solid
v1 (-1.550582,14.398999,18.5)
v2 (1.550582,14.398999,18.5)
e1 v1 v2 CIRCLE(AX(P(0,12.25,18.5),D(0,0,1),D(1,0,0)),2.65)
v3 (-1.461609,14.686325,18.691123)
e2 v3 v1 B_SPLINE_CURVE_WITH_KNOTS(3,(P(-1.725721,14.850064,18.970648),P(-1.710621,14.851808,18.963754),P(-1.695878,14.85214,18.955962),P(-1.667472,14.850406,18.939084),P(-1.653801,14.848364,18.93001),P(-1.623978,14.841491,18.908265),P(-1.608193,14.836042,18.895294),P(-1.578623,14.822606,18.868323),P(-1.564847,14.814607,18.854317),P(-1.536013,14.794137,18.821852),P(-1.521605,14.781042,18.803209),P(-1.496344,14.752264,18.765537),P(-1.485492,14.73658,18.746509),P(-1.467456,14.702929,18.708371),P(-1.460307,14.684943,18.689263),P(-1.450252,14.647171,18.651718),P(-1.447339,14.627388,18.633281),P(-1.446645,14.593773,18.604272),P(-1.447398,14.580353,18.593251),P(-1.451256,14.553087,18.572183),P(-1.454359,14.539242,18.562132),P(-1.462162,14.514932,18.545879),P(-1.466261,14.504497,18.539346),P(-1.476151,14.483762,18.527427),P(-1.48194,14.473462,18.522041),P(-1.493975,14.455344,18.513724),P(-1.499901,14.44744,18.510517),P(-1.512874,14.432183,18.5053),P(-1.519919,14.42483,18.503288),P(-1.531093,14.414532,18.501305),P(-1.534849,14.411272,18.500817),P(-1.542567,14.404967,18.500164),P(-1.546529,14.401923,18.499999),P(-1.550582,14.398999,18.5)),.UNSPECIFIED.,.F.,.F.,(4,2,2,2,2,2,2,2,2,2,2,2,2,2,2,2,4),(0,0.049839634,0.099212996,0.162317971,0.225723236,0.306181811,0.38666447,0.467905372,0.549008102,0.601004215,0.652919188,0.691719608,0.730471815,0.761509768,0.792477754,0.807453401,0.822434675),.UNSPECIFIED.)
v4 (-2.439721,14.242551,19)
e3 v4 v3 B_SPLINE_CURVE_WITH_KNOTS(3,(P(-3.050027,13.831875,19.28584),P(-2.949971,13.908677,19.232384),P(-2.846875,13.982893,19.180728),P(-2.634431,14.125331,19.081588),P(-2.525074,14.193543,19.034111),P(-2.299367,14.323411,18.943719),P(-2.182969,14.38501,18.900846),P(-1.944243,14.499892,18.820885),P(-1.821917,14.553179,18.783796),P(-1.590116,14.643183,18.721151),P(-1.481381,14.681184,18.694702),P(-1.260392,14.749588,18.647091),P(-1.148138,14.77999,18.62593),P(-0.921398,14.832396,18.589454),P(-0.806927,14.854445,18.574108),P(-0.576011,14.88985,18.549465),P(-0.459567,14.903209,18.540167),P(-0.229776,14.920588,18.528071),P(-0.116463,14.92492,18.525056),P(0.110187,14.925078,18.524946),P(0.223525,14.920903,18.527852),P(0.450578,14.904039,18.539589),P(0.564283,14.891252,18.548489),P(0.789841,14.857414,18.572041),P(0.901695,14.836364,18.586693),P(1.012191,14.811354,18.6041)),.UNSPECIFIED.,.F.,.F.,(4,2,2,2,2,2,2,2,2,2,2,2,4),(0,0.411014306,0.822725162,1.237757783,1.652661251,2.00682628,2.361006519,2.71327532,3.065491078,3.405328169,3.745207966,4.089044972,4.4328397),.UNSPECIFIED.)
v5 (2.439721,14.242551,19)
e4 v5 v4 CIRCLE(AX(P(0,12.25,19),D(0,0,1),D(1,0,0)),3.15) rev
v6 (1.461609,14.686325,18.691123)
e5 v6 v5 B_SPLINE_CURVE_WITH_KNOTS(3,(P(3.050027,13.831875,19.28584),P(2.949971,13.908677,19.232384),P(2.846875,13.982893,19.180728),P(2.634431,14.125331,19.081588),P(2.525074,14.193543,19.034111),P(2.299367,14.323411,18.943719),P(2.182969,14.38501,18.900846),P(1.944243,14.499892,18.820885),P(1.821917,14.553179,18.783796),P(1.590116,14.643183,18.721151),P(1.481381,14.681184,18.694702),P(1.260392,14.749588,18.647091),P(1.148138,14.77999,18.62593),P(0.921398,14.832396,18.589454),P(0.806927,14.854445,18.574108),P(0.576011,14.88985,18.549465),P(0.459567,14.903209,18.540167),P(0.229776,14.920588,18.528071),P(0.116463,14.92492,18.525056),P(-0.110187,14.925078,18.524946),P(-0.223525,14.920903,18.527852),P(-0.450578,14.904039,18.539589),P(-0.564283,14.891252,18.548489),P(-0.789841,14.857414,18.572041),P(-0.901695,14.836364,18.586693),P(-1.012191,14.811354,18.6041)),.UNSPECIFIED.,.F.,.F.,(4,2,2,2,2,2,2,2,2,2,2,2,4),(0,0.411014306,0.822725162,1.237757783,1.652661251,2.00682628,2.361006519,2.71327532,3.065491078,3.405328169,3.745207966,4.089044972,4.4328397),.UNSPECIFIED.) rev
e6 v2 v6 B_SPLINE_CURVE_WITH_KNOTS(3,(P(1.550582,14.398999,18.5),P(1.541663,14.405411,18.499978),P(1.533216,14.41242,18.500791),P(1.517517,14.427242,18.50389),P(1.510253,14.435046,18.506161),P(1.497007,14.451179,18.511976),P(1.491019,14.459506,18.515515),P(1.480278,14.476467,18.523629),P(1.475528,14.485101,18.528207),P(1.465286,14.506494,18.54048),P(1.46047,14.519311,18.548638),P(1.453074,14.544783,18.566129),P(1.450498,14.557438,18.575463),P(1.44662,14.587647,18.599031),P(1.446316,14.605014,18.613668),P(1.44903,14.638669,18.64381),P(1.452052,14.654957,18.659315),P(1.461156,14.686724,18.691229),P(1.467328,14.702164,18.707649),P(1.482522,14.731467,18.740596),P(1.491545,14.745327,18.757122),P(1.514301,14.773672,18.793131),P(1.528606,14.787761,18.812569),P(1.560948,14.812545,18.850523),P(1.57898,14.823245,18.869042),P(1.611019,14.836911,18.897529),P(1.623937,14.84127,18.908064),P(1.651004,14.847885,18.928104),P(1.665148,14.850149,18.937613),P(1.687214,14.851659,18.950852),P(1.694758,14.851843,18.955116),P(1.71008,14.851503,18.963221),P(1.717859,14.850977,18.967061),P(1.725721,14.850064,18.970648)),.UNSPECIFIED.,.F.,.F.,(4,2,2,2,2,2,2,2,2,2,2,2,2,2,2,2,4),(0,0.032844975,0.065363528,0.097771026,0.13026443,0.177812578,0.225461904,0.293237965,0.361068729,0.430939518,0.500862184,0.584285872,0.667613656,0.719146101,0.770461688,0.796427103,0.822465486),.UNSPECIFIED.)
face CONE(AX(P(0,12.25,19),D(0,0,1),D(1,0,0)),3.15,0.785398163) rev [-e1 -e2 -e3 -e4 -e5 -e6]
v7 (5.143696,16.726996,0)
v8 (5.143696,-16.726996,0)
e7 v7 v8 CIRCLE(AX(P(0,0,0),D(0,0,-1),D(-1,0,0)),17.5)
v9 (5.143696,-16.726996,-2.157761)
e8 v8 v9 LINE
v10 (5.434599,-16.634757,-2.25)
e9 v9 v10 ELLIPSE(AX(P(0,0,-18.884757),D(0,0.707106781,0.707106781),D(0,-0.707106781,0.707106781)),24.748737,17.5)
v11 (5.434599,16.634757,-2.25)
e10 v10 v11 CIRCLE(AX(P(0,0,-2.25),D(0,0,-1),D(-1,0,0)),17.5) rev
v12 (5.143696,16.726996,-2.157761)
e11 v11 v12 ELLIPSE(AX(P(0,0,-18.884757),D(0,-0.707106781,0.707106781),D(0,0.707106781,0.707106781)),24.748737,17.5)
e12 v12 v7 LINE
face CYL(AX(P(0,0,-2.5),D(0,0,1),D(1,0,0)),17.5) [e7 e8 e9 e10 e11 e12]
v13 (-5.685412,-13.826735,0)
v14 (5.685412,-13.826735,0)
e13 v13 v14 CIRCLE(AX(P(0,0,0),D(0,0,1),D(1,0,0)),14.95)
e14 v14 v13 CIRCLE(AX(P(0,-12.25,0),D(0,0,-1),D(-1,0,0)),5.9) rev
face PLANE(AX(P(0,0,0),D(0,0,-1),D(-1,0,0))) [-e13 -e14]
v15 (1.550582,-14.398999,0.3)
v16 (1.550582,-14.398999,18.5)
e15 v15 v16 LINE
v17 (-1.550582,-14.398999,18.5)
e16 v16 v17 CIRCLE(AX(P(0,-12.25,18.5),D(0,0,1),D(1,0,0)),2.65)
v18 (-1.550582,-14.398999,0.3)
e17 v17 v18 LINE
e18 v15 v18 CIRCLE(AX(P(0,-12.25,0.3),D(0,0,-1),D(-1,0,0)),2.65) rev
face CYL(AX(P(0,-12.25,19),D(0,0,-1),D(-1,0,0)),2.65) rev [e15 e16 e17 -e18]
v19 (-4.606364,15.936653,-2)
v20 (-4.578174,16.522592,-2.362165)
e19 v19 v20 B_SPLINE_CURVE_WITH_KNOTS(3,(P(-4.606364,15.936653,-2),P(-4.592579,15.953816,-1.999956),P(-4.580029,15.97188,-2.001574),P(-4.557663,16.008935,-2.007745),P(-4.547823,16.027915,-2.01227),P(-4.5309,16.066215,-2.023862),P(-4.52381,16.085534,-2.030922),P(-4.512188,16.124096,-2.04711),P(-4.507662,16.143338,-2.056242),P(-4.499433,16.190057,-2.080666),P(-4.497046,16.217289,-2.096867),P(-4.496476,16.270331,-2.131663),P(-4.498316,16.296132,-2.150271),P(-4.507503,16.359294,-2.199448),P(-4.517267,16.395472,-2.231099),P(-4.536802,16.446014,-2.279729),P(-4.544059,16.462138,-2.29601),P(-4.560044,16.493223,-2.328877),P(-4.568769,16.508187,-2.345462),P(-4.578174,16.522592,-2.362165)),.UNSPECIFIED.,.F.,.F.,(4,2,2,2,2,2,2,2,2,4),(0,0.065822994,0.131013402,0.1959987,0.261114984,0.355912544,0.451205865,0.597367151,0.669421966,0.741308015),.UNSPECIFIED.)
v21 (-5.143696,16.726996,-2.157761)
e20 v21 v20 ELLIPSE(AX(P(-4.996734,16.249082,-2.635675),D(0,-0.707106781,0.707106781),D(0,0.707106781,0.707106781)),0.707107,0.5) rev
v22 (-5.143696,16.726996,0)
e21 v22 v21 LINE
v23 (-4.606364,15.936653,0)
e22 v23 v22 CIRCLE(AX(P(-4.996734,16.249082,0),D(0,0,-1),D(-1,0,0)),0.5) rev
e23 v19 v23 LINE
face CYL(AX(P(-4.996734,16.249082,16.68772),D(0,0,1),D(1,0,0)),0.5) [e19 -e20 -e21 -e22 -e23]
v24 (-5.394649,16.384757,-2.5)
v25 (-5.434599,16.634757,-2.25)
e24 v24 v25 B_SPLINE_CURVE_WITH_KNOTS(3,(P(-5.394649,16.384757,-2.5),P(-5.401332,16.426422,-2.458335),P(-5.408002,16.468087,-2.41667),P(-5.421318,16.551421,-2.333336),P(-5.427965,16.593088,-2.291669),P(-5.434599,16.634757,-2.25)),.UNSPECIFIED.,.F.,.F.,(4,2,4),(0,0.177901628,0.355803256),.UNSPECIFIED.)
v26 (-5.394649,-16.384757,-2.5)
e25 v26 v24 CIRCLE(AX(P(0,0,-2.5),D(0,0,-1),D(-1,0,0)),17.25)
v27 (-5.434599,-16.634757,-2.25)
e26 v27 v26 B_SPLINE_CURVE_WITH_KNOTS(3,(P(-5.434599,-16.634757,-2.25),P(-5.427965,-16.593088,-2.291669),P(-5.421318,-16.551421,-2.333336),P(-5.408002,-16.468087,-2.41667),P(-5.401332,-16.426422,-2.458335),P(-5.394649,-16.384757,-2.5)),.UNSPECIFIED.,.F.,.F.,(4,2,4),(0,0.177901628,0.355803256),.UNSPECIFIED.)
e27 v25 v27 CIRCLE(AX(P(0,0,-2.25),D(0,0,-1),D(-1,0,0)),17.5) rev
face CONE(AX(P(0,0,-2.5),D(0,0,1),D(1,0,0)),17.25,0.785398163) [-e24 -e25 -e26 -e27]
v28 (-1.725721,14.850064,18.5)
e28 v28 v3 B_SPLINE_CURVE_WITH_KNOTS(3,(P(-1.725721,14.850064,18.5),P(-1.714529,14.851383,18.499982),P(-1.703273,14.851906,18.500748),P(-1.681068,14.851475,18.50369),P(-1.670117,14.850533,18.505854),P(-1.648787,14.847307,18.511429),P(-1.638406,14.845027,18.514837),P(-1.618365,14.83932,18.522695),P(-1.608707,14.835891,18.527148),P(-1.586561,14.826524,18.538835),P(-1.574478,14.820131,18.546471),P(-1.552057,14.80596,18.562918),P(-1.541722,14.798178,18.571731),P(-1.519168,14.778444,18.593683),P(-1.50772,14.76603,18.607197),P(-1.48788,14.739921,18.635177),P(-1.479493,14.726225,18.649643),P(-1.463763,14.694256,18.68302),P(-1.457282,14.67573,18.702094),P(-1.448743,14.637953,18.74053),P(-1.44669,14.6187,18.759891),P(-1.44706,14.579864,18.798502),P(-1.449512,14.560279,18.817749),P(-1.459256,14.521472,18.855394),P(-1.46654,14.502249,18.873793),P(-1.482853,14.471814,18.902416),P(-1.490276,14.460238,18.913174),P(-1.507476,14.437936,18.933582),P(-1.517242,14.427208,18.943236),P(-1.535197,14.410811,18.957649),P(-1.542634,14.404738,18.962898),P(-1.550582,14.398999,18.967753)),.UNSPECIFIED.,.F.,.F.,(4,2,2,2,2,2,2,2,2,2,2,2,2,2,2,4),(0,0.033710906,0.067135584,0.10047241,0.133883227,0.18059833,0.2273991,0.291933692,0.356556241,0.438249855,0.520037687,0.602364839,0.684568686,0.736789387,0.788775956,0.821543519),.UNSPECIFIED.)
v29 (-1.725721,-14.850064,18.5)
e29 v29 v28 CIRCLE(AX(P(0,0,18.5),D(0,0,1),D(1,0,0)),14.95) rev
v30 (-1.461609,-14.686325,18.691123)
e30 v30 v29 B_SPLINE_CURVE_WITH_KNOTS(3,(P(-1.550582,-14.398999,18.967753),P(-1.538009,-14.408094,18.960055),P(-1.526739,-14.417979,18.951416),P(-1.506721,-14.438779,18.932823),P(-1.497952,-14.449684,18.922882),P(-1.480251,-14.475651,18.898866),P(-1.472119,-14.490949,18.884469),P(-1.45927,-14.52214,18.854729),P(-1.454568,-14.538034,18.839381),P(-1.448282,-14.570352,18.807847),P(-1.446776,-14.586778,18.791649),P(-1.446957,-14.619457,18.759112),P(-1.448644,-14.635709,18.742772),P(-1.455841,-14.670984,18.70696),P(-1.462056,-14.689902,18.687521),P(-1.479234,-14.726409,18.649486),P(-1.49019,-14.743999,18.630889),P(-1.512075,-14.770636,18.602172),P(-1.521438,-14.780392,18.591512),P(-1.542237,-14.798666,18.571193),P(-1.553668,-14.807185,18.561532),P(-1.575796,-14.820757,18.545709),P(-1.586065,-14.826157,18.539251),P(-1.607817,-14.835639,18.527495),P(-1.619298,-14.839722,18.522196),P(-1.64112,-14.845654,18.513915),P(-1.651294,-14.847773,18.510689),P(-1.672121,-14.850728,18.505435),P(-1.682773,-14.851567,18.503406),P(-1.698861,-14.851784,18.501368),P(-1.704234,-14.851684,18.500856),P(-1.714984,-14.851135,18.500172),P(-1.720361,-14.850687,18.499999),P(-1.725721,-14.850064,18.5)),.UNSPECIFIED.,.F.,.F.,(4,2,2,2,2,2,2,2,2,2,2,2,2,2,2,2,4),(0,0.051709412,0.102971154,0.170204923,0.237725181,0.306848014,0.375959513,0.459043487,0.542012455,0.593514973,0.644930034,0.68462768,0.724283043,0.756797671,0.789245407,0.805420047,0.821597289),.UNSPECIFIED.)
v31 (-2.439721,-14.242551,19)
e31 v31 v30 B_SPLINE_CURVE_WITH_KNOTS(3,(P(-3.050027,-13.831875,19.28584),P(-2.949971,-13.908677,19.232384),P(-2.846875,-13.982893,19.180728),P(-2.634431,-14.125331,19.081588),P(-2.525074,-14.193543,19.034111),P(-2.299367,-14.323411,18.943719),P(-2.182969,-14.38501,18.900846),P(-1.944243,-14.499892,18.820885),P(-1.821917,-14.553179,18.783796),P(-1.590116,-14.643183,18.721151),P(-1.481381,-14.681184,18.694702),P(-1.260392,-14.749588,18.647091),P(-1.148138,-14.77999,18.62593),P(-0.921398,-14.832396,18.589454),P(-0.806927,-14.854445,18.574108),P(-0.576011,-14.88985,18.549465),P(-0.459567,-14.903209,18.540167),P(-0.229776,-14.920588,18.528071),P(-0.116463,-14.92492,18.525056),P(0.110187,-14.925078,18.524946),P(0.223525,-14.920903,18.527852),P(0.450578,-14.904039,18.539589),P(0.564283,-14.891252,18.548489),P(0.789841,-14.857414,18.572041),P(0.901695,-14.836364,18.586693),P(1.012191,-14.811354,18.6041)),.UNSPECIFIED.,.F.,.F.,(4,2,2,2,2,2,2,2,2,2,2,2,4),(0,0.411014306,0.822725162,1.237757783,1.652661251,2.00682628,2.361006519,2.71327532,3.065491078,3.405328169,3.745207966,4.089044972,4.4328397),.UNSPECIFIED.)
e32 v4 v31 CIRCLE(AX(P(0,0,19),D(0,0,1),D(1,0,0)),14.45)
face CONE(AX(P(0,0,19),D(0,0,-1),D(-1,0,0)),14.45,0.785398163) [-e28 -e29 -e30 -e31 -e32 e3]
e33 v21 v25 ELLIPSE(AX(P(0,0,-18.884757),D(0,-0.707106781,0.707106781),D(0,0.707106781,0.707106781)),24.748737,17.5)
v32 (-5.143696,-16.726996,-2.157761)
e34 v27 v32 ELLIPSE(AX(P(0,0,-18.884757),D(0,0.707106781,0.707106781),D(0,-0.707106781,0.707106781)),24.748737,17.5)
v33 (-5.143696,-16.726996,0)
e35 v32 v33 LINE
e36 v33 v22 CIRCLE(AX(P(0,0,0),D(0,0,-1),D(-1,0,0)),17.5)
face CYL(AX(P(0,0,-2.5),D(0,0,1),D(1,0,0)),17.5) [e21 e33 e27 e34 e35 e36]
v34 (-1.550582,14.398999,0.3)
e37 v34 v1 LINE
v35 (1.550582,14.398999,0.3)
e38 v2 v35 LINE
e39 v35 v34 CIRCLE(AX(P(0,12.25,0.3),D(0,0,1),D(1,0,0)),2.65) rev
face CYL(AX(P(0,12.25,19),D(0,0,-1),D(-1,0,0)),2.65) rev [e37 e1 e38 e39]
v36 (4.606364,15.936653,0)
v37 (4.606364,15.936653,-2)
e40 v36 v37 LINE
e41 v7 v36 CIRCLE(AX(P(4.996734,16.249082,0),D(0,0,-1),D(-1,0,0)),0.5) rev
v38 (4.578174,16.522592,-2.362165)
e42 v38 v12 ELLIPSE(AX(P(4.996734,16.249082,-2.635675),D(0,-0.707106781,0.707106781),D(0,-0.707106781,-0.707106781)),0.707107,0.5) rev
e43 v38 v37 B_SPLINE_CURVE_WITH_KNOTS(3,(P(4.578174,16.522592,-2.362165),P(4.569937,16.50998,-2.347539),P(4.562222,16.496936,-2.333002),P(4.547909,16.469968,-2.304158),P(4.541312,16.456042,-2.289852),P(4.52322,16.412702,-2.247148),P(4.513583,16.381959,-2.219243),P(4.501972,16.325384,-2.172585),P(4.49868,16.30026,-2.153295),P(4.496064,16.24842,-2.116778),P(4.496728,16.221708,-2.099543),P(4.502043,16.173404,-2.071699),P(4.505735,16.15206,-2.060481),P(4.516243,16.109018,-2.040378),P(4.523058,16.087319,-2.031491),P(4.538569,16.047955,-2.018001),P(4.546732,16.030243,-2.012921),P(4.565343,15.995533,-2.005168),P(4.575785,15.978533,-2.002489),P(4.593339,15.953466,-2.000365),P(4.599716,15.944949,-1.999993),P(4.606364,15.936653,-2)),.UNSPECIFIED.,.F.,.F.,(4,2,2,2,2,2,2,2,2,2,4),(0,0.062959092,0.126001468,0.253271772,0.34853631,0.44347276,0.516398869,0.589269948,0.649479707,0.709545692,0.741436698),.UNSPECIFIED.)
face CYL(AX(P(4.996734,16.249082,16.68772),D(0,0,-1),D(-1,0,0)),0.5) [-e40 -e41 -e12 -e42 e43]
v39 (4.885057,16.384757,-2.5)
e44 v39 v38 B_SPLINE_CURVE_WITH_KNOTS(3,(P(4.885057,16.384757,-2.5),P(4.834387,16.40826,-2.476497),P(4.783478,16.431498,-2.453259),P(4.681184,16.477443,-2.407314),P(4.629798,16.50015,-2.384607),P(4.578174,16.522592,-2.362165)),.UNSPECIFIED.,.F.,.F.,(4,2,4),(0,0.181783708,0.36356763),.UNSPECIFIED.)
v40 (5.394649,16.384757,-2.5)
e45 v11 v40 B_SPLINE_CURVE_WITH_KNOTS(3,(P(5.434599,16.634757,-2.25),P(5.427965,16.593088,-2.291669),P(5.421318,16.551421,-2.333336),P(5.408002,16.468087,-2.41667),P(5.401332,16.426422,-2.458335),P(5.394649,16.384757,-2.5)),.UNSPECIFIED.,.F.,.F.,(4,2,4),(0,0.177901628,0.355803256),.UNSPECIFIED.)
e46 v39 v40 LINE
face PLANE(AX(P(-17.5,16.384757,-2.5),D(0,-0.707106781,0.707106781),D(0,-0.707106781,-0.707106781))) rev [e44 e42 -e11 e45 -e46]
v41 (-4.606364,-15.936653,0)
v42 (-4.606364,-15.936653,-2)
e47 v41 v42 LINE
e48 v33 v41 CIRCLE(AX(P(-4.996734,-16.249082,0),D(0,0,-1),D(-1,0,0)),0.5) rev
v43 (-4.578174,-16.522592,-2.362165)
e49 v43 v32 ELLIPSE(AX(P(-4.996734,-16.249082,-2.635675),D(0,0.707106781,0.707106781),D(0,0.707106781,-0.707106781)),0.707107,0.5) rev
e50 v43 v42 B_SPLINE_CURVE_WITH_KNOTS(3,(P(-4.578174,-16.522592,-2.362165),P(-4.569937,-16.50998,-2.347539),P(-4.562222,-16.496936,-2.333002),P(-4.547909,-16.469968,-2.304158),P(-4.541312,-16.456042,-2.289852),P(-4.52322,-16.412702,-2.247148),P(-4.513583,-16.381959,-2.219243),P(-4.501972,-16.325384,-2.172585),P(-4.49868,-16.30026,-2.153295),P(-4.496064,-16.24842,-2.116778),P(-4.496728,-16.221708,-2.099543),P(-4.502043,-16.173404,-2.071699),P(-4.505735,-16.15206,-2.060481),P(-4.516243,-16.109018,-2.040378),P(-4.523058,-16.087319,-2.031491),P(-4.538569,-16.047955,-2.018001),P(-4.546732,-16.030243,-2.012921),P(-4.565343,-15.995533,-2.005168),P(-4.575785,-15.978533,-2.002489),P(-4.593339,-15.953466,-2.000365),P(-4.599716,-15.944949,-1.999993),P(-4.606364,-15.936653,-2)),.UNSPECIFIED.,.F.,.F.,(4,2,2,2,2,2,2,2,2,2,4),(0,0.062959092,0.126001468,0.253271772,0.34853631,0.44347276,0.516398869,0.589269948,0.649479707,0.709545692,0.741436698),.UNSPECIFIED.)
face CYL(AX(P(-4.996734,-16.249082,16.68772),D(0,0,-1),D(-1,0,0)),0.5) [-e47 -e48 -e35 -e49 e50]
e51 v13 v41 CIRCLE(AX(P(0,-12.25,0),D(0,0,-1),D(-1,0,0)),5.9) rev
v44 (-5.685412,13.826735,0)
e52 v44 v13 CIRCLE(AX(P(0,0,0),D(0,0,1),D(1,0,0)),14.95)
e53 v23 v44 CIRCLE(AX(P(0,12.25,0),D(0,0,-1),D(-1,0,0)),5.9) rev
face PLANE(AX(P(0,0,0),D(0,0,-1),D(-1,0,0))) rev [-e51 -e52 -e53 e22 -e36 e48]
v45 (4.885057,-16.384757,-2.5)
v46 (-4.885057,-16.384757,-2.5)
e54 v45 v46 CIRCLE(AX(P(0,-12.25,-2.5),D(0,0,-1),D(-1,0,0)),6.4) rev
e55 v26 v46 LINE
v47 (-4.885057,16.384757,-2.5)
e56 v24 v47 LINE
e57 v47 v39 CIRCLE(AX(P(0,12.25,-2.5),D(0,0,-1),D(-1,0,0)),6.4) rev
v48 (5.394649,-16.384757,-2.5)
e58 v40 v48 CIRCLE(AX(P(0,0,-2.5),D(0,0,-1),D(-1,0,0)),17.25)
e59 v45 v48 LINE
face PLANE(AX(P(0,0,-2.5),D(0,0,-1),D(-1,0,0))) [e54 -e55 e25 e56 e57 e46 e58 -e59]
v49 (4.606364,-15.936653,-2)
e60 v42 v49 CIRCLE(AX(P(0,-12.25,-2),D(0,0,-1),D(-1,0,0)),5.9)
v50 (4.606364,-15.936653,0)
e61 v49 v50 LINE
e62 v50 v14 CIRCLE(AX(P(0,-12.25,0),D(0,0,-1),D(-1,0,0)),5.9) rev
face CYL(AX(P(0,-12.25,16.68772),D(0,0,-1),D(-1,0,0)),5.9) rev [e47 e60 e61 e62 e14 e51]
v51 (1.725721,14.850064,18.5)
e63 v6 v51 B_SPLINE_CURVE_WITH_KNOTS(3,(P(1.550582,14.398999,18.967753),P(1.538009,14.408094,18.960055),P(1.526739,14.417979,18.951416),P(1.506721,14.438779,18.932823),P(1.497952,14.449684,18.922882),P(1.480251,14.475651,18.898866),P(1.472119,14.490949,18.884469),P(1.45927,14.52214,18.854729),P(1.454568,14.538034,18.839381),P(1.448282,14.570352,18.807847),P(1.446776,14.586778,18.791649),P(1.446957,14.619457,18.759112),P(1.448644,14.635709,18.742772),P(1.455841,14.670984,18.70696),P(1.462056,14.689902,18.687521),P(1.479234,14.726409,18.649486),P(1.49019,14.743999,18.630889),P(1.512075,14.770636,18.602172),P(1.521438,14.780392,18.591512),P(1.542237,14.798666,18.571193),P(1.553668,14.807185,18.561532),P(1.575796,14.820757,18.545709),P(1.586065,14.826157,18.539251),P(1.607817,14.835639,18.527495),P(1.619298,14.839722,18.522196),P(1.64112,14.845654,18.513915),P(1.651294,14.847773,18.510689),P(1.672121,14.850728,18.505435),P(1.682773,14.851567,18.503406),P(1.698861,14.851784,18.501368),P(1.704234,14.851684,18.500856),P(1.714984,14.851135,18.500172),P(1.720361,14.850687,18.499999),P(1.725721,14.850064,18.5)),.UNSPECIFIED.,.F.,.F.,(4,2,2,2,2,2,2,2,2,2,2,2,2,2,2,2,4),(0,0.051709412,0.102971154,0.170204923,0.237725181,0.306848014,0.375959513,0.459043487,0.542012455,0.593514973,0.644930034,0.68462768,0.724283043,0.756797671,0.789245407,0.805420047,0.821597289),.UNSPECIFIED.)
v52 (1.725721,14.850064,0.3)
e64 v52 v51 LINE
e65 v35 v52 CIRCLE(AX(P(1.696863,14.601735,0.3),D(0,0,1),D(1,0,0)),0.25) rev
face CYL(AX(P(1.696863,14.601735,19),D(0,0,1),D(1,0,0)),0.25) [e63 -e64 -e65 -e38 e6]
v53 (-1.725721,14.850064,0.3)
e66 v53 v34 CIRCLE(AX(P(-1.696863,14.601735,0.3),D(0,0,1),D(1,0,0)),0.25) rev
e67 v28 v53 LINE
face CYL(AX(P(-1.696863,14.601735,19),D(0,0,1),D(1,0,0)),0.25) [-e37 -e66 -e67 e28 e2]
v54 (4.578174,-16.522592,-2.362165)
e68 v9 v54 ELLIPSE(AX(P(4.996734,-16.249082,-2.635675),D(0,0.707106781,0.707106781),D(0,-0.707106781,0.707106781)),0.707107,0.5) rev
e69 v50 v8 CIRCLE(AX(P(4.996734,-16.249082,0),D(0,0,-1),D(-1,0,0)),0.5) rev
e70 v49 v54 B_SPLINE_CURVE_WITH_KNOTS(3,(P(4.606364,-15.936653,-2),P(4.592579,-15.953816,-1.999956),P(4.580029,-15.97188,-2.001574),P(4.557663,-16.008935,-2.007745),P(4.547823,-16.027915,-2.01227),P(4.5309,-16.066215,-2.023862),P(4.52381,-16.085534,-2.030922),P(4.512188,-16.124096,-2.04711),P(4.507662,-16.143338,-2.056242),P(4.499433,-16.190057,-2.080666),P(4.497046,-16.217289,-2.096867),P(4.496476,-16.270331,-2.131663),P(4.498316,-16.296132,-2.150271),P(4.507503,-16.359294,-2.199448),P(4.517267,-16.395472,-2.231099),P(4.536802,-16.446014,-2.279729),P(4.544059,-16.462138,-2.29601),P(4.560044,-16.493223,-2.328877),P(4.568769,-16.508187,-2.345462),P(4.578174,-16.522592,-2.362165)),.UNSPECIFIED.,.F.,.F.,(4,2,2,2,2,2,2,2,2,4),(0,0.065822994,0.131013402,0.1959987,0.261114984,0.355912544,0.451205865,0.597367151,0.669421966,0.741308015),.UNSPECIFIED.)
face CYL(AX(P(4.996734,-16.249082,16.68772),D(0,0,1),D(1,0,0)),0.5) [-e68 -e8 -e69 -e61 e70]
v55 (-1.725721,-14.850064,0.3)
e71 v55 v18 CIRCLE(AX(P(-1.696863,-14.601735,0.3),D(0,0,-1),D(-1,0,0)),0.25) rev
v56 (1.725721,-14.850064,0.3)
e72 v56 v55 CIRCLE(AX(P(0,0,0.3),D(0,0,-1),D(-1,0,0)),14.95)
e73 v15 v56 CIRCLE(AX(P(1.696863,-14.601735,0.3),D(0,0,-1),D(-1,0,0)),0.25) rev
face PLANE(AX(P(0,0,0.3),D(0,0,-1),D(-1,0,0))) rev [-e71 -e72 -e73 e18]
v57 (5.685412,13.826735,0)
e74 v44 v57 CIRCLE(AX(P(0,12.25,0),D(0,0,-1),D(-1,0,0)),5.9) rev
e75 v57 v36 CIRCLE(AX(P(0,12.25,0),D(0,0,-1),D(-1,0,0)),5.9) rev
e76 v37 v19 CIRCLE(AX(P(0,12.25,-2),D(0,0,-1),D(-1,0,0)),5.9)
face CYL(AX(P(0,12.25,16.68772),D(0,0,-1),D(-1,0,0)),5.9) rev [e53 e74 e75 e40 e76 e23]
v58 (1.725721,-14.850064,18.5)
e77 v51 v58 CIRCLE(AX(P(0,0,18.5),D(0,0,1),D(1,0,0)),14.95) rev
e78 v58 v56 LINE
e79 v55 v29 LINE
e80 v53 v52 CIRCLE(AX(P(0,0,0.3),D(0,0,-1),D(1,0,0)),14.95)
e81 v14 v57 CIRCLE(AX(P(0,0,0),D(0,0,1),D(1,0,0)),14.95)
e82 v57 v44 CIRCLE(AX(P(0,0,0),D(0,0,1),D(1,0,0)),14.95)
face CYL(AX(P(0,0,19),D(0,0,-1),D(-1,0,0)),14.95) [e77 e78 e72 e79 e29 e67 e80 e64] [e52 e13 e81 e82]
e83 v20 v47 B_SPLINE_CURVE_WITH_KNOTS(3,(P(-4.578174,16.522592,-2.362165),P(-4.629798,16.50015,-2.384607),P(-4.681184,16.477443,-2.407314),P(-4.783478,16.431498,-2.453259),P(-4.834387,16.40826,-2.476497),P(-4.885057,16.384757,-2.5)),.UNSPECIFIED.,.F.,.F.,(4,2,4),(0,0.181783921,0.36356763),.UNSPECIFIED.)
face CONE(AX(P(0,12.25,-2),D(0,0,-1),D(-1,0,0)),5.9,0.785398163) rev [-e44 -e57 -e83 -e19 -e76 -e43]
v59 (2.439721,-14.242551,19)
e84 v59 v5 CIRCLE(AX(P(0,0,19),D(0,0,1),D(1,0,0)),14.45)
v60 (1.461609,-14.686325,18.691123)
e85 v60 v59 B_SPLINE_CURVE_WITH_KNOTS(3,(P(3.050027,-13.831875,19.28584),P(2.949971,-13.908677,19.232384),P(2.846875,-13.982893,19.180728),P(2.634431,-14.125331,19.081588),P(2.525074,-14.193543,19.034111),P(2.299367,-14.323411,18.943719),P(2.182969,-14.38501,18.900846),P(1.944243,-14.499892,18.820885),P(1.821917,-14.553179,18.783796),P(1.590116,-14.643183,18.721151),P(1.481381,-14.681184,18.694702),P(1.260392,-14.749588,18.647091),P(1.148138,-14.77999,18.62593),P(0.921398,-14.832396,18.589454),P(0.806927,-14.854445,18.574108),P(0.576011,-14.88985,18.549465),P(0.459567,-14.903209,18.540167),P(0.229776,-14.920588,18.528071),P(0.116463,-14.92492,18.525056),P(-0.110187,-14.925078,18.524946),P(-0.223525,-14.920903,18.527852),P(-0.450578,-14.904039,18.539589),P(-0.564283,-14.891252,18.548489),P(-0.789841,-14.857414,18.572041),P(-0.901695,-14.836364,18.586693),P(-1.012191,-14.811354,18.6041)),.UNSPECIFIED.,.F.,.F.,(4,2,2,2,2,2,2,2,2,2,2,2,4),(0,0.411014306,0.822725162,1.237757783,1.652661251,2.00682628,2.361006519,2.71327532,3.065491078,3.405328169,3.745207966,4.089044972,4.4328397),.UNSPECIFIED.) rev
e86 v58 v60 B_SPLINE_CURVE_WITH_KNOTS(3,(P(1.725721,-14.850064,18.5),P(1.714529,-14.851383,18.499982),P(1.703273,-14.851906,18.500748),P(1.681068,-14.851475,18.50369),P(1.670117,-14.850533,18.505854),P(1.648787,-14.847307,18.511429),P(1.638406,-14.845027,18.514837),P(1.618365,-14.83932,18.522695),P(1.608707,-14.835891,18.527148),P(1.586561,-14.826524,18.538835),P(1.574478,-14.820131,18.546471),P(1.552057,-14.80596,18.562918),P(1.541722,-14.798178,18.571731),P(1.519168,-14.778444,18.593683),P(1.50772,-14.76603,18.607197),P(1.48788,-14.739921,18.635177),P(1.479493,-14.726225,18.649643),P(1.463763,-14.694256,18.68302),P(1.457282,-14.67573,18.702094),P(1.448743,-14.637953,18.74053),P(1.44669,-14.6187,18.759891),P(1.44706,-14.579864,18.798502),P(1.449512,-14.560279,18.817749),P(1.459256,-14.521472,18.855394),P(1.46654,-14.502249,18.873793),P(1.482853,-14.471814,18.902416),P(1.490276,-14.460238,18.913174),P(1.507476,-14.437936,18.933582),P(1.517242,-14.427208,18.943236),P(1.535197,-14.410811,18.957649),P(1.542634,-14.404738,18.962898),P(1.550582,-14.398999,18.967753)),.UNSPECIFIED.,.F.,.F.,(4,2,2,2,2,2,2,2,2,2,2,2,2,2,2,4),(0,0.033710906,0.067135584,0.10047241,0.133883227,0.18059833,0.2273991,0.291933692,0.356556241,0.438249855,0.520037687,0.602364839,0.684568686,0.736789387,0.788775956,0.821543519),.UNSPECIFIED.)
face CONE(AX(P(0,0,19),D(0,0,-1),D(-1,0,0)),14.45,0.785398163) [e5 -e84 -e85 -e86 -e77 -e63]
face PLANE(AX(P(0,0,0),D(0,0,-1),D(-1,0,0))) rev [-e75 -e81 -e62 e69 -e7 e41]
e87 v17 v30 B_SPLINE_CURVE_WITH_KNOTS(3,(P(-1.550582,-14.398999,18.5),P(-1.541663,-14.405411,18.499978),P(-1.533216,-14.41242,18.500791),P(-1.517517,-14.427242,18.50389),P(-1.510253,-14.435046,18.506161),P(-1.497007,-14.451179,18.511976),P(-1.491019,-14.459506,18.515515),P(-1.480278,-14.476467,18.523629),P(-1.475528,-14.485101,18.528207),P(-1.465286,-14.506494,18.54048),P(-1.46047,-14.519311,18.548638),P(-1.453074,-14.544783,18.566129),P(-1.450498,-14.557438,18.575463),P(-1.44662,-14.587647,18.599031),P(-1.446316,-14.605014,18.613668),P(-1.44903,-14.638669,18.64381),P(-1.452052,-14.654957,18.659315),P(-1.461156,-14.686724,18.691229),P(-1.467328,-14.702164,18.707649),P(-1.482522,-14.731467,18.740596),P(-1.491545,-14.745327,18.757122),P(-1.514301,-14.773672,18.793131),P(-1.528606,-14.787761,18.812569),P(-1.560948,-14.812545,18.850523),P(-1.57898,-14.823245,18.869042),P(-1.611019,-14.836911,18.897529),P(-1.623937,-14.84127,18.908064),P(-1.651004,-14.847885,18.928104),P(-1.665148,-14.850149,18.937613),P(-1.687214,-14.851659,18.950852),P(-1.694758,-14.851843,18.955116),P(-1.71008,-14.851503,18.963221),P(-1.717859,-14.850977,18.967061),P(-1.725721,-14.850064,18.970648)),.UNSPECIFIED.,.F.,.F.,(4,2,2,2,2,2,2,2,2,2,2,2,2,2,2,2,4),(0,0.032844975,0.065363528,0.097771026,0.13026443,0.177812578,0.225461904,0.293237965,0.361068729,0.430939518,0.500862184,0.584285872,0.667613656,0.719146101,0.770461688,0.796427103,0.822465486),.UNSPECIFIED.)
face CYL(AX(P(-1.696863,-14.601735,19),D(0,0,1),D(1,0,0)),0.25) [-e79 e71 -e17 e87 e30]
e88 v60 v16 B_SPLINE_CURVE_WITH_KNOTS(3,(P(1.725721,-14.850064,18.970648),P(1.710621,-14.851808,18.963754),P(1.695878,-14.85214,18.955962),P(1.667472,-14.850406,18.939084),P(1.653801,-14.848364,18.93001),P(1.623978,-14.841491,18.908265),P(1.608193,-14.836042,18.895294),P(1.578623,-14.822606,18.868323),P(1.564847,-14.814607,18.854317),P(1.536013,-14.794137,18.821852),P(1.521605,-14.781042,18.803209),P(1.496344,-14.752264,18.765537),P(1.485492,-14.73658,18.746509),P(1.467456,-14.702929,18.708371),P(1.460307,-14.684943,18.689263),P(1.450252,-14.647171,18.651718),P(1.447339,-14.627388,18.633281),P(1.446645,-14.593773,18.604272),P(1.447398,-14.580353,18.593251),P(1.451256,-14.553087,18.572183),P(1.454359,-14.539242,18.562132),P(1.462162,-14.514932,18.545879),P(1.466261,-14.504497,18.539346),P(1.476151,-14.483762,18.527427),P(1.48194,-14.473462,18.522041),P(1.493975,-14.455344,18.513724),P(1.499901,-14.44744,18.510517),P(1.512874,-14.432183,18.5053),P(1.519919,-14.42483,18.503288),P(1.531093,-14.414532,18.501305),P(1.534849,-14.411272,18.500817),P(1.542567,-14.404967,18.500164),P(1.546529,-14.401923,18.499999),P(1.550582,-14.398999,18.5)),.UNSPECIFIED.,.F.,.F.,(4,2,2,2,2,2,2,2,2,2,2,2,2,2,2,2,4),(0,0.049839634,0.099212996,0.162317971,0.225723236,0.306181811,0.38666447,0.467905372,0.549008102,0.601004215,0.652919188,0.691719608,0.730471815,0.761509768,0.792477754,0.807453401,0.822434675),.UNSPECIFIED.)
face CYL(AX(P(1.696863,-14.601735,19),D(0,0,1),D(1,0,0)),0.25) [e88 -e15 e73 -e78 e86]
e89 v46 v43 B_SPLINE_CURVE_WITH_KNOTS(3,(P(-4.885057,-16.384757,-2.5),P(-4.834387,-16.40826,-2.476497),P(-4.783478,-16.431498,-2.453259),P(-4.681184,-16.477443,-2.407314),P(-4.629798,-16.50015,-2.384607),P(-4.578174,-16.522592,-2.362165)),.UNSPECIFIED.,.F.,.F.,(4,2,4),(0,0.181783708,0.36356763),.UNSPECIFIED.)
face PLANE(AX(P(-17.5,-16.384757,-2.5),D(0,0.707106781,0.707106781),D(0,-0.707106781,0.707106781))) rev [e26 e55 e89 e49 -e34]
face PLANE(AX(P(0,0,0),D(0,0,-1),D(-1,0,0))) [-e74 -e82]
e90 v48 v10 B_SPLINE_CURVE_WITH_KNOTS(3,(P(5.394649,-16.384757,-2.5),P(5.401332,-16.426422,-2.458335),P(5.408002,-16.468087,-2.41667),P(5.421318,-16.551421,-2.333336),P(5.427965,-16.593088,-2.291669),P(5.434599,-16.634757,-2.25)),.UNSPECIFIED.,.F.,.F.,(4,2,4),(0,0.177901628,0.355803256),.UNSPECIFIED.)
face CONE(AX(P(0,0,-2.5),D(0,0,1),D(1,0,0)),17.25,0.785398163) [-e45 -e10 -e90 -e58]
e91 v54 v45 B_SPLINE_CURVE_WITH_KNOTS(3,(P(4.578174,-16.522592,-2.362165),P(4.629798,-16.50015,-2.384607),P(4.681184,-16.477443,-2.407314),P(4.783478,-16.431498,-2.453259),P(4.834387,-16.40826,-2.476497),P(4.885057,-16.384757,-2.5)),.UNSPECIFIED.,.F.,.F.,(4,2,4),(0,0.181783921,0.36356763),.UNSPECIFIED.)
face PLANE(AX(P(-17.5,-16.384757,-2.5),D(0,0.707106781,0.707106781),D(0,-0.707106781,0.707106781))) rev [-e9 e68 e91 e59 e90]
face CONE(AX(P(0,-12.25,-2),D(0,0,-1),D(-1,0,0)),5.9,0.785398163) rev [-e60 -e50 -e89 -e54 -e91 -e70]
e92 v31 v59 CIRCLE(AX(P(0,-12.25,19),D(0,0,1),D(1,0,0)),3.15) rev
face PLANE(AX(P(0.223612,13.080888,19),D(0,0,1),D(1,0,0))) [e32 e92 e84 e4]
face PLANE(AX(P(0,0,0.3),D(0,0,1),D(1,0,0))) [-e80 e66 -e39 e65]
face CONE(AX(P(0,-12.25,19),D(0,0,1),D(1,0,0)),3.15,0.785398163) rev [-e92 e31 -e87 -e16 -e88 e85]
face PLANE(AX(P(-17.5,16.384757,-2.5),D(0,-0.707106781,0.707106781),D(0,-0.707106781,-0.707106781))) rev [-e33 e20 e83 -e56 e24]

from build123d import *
from build123d.topology import SkipClean

# Parameters (mm, degrees)
BOSS_EXTRUDE1_DEPTH     = 19
FILLET2_R               = 0.25
BOSS_EXTRUDE2_START     = 2.5
SKETCH3_R               = 17.5
SKETCH3_R_2             = 2.65
BOSS_EXTRUDE2_DEPTH     = 2.5
SKETCH4_R               = 5.9
CUT_EXTRUDE1_DEPTH      = 2.5
FILLET1_R               = 0.5
CUT_EXTRUDE2_DEPTH      = 31.786064168
CUT_EXTRUDE2_DEPTH_BACK = 31.786064168
BOSS_EXTRUDE3_DEPTH     = 0.3
CHAMFER1_SIZE           = 0.25
CHAMFER2_SIZE           = 0.5


with BuildPart() as part:
    # Sketch2 → Boss-Extrude1 (new body)
    with BuildSketch(Plane.XY):
        with BuildLine():
            ThreePointArc((-0.480352472, 14.942281001), (-14.95, 0), (-0.480352472, -14.942281001))
            ThreePointArc((-0.480352472, -14.942281001), (-0.308693392, -14.933464362), (-0.140884454, -14.896252363))
            ThreePointArc((-0.140884454, -14.896252363), (0, -9.6), (0.140884454, -14.896252363))
            ThreePointArc((0.140884454, -14.896252363), (0.308693392, -14.933464362), (0.480352472, -14.942281001))
            ThreePointArc((0.480352472, -14.942281001), (14.95, 0), (0.480352472, 14.942281001))
            ThreePointArc((0.480352472, 14.942281001), (0.308693392, 14.933464362), (0.140884454, 14.896252363))
            ThreePointArc((0.140884454, 14.896252363), (0, 9.6), (-0.140884454, 14.896252363))
            ThreePointArc((-0.140884454, 14.896252363), (-0.308693392, 14.933464362), (-0.480352472, 14.942281001))
        make_face()
    extrude(amount=BOSS_EXTRUDE1_DEPTH)

    # Fillet2
    fillet2_edges = [part.edges().sort_by_distance(p)[0] for p in [
        (0.140884454, 14.896252363, 9.5),
        (-0.140884454, 14.896252363, 9.5),
        (0.140884454, -14.896252363, 9.5),
        (-0.140884454, -14.896252363, 9.5),
    ]]
    fillet(fillet2_edges, radius=FILLET2_R)

    # Sketch3 → Boss-Extrude2 (add)
    with BuildSketch(Plane(origin=(0, 0, 0), x_dir=(-1, 0, 0), z_dir=(0, 0, -1)).offset(BOSS_EXTRUDE2_START)):
        Circle(SKETCH3_R)
        with Locations((0, 12.25)):
            Circle(SKETCH3_R_2, mode=Mode.SUBTRACT)
        with Locations((0, -12.25)):
            Circle(SKETCH3_R_2, mode=Mode.SUBTRACT)
    extrude(amount=-BOSS_EXTRUDE2_DEPTH)

    # Sketch4 → Cut-Extrude1 (cut)
    with BuildSketch(Plane(origin=(0, 0, -2.5), x_dir=(-1, 0, 0), z_dir=(0, 0, -1))):
        with Locations((0, 12.25)):
            Circle(SKETCH4_R)
        with Locations((0, -12.25)):
            Circle(SKETCH4_R)
    extrude(amount=-CUT_EXTRUDE1_DEPTH, mode=Mode.SUBTRACT)

    # Fillet1
    fillet1_edges = [part.edges().sort_by_distance(p)[0] for p in [
        (-3.204069932, -17.204183673, -1.25),
        (3.204069932, -17.204183673, -1.25),
        (3.204069932, 17.204183673, -1.25),
        (-3.204069932, 17.204183673, -1.25),
    ]]
    fillet(fillet1_edges, radius=FILLET1_R)

    # Sketch6 → Cut-Extrude2 (cut, two sides: drawn at the far end of the back side and taken through both)
    with BuildSketch(Plane(origin=(0, 0, 0), x_dir=(0, 0, -1), z_dir=(1, 0, 0)).offset(-CUT_EXTRUDE2_DEPTH_BACK)):
        Polygon((2.5, 16.384756954), (1.839011593, 17.045745361), (2.5, 17.045745361), align=None)
        Polygon((2.5, -17.045745361), (1.839011593, -17.045745361), (2.5, -16.384756954), align=None)
    extrude(amount=CUT_EXTRUDE2_DEPTH + CUT_EXTRUDE2_DEPTH_BACK, mode=Mode.SUBTRACT)

    # Sketch5 → Boss-Extrude3 (add)
    with SkipClean():  # the faces are left unmerged after this step: merging them gives an invalid solid
        with BuildSketch(Plane(origin=(0, 0, 0), x_dir=(-1, 0, 0), z_dir=(0, 0, -1))):
            with BuildLine():
                Line((1.725721181, 14.850063515), (3.599704445, 11.66813084))
                Line((3.599704445, 11.66813084), (0.332481581, 8.719914622))
                Line((0.332481581, 8.719914622), (-3.586502444, 11.083425606))
                Line((-3.586502444, 11.083425606), (-1.725721181, 14.850063515))
                ThreePointArc((-1.725721181, 14.850063515), (0, 14.95), (1.725721181, 14.850063515))
            make_face()
            with BuildLine():
                Line((-3.586502444, -11.083425606), (-1.725721181, -14.850063515))
                ThreePointArc((-1.725721181, -14.850063515), (0, -14.95), (1.725721181, -14.850063515))
                Line((1.725721181, -14.850063515), (3.599704445, -11.66813084))
                Line((3.599704445, -11.66813084), (0.332481581, -8.719914622))
                Line((0.332481581, -8.719914622), (-3.586502444, -11.083425606))
            make_face()
        extrude(amount=-BOSS_EXTRUDE3_DEPTH)

    # Chamfer1
    chamfer1_edges = [part.edges().sort_by_distance(p)[0] for p in [
        (-17.5, 0, -2.5),
        (17.5, 0, -2.5),
    ]]
    chamfer(chamfer1_edges, length=CHAMFER1_SIZE)

    # Chamfer2
    # the kernel refuses this chamfer: 0.5 mm, written as the material it takes off along each edge
    with BuildSketch(Plane(origin=(0, -12.25, -2.5), x_dir=(0.6266072217186398, -0.7793352229240299, 0), z_dir=(-0.7793352229240299, -0.6266072217186398, 0))) as chamfer2_piece_1:
        Polygon((5.9 + CHAMFER2_SIZE, 0), (5.9, CHAMFER2_SIZE), (5.9, 0), align=None)
    revolve(axis=Axis((0, -12.25, -2.5), (0, 0, 1)), revolution_arc=282.399498551, mode=Mode.SUBTRACT)
    with BuildSketch(Plane(origin=(0, 12.25, -2.5), x_dir=(0.6266072217186399, 0.7793352229240298, 0), z_dir=(-0.7793352229240298, 0.6266072217186399, 0))) as chamfer2_piece_2:
        Polygon((5.9 + CHAMFER2_SIZE, 0), (5.9, -CHAMFER2_SIZE), (5.9, 0), align=None)
    revolve(axis=Axis((0, 12.25, -2.5), (0, 0, -1)), revolution_arc=282.399498551, mode=Mode.SUBTRACT)
    with BuildSketch(Plane(origin=(0, -12.25, 19), x_dir=(-0.13736903442789797, -0.990519938406263, 0), z_dir=(0.990519938406263, -0.13736903442789797, 0))) as chamfer2_piece_3:
        Polygon((2.65 + CHAMFER2_SIZE, 0), (2.65, CHAMFER2_SIZE), (2.65, 0), align=None)
    revolve(axis=Axis((0, -12.25, 19), (0, 0, -1)), revolution_arc=344.208735855, mode=Mode.SUBTRACT)
    with BuildSketch(Plane(origin=(0, 12.25, 19), x_dir=(0.13736903442790002, 0.9905199384062627, 0), z_dir=(-0.9905199384062627, 0.13736903442790002, 0))) as chamfer2_piece_4:
        Polygon((2.65 + CHAMFER2_SIZE, 0), (2.65, CHAMFER2_SIZE), (2.65, 0), align=None)
    revolve(axis=Axis((0, 12.25, 19), (0, 0, -1)), revolution_arc=344.208735855, mode=Mode.SUBTRACT)
    with BuildSketch(Plane(origin=(0, 0, 19), x_dir=(-0.02955831012305068, 0.9995630576920446, 0), z_dir=(0.9995630576920446, 0.02955831012305068, 0))) as chamfer2_piece_5:
        Polygon((14.95 - CHAMFER2_SIZE, 0), (14.95, -CHAMFER2_SIZE), (14.95, 0), align=None)
    revolve(axis=Axis((0, 0, 19), (0, 0, 1)), revolution_arc=176.612373747, mode=Mode.SUBTRACT)
    with BuildSketch(Plane(origin=(0, 0, 19), x_dir=(0.029558310123051157, -0.9995630576920446, 0), z_dir=(-0.9995630576920446, -0.029558310123051157, 0))) as chamfer2_piece_6:
        Polygon((14.95, -CHAMFER2_SIZE), (14.95 - CHAMFER2_SIZE, 0), (14.95, 0), align=None)
    revolve(axis=Axis((0, 0, 19), (0, 0, 1)), revolution_arc=176.612373747, mode=Mode.SUBTRACT)


solid = part.part
